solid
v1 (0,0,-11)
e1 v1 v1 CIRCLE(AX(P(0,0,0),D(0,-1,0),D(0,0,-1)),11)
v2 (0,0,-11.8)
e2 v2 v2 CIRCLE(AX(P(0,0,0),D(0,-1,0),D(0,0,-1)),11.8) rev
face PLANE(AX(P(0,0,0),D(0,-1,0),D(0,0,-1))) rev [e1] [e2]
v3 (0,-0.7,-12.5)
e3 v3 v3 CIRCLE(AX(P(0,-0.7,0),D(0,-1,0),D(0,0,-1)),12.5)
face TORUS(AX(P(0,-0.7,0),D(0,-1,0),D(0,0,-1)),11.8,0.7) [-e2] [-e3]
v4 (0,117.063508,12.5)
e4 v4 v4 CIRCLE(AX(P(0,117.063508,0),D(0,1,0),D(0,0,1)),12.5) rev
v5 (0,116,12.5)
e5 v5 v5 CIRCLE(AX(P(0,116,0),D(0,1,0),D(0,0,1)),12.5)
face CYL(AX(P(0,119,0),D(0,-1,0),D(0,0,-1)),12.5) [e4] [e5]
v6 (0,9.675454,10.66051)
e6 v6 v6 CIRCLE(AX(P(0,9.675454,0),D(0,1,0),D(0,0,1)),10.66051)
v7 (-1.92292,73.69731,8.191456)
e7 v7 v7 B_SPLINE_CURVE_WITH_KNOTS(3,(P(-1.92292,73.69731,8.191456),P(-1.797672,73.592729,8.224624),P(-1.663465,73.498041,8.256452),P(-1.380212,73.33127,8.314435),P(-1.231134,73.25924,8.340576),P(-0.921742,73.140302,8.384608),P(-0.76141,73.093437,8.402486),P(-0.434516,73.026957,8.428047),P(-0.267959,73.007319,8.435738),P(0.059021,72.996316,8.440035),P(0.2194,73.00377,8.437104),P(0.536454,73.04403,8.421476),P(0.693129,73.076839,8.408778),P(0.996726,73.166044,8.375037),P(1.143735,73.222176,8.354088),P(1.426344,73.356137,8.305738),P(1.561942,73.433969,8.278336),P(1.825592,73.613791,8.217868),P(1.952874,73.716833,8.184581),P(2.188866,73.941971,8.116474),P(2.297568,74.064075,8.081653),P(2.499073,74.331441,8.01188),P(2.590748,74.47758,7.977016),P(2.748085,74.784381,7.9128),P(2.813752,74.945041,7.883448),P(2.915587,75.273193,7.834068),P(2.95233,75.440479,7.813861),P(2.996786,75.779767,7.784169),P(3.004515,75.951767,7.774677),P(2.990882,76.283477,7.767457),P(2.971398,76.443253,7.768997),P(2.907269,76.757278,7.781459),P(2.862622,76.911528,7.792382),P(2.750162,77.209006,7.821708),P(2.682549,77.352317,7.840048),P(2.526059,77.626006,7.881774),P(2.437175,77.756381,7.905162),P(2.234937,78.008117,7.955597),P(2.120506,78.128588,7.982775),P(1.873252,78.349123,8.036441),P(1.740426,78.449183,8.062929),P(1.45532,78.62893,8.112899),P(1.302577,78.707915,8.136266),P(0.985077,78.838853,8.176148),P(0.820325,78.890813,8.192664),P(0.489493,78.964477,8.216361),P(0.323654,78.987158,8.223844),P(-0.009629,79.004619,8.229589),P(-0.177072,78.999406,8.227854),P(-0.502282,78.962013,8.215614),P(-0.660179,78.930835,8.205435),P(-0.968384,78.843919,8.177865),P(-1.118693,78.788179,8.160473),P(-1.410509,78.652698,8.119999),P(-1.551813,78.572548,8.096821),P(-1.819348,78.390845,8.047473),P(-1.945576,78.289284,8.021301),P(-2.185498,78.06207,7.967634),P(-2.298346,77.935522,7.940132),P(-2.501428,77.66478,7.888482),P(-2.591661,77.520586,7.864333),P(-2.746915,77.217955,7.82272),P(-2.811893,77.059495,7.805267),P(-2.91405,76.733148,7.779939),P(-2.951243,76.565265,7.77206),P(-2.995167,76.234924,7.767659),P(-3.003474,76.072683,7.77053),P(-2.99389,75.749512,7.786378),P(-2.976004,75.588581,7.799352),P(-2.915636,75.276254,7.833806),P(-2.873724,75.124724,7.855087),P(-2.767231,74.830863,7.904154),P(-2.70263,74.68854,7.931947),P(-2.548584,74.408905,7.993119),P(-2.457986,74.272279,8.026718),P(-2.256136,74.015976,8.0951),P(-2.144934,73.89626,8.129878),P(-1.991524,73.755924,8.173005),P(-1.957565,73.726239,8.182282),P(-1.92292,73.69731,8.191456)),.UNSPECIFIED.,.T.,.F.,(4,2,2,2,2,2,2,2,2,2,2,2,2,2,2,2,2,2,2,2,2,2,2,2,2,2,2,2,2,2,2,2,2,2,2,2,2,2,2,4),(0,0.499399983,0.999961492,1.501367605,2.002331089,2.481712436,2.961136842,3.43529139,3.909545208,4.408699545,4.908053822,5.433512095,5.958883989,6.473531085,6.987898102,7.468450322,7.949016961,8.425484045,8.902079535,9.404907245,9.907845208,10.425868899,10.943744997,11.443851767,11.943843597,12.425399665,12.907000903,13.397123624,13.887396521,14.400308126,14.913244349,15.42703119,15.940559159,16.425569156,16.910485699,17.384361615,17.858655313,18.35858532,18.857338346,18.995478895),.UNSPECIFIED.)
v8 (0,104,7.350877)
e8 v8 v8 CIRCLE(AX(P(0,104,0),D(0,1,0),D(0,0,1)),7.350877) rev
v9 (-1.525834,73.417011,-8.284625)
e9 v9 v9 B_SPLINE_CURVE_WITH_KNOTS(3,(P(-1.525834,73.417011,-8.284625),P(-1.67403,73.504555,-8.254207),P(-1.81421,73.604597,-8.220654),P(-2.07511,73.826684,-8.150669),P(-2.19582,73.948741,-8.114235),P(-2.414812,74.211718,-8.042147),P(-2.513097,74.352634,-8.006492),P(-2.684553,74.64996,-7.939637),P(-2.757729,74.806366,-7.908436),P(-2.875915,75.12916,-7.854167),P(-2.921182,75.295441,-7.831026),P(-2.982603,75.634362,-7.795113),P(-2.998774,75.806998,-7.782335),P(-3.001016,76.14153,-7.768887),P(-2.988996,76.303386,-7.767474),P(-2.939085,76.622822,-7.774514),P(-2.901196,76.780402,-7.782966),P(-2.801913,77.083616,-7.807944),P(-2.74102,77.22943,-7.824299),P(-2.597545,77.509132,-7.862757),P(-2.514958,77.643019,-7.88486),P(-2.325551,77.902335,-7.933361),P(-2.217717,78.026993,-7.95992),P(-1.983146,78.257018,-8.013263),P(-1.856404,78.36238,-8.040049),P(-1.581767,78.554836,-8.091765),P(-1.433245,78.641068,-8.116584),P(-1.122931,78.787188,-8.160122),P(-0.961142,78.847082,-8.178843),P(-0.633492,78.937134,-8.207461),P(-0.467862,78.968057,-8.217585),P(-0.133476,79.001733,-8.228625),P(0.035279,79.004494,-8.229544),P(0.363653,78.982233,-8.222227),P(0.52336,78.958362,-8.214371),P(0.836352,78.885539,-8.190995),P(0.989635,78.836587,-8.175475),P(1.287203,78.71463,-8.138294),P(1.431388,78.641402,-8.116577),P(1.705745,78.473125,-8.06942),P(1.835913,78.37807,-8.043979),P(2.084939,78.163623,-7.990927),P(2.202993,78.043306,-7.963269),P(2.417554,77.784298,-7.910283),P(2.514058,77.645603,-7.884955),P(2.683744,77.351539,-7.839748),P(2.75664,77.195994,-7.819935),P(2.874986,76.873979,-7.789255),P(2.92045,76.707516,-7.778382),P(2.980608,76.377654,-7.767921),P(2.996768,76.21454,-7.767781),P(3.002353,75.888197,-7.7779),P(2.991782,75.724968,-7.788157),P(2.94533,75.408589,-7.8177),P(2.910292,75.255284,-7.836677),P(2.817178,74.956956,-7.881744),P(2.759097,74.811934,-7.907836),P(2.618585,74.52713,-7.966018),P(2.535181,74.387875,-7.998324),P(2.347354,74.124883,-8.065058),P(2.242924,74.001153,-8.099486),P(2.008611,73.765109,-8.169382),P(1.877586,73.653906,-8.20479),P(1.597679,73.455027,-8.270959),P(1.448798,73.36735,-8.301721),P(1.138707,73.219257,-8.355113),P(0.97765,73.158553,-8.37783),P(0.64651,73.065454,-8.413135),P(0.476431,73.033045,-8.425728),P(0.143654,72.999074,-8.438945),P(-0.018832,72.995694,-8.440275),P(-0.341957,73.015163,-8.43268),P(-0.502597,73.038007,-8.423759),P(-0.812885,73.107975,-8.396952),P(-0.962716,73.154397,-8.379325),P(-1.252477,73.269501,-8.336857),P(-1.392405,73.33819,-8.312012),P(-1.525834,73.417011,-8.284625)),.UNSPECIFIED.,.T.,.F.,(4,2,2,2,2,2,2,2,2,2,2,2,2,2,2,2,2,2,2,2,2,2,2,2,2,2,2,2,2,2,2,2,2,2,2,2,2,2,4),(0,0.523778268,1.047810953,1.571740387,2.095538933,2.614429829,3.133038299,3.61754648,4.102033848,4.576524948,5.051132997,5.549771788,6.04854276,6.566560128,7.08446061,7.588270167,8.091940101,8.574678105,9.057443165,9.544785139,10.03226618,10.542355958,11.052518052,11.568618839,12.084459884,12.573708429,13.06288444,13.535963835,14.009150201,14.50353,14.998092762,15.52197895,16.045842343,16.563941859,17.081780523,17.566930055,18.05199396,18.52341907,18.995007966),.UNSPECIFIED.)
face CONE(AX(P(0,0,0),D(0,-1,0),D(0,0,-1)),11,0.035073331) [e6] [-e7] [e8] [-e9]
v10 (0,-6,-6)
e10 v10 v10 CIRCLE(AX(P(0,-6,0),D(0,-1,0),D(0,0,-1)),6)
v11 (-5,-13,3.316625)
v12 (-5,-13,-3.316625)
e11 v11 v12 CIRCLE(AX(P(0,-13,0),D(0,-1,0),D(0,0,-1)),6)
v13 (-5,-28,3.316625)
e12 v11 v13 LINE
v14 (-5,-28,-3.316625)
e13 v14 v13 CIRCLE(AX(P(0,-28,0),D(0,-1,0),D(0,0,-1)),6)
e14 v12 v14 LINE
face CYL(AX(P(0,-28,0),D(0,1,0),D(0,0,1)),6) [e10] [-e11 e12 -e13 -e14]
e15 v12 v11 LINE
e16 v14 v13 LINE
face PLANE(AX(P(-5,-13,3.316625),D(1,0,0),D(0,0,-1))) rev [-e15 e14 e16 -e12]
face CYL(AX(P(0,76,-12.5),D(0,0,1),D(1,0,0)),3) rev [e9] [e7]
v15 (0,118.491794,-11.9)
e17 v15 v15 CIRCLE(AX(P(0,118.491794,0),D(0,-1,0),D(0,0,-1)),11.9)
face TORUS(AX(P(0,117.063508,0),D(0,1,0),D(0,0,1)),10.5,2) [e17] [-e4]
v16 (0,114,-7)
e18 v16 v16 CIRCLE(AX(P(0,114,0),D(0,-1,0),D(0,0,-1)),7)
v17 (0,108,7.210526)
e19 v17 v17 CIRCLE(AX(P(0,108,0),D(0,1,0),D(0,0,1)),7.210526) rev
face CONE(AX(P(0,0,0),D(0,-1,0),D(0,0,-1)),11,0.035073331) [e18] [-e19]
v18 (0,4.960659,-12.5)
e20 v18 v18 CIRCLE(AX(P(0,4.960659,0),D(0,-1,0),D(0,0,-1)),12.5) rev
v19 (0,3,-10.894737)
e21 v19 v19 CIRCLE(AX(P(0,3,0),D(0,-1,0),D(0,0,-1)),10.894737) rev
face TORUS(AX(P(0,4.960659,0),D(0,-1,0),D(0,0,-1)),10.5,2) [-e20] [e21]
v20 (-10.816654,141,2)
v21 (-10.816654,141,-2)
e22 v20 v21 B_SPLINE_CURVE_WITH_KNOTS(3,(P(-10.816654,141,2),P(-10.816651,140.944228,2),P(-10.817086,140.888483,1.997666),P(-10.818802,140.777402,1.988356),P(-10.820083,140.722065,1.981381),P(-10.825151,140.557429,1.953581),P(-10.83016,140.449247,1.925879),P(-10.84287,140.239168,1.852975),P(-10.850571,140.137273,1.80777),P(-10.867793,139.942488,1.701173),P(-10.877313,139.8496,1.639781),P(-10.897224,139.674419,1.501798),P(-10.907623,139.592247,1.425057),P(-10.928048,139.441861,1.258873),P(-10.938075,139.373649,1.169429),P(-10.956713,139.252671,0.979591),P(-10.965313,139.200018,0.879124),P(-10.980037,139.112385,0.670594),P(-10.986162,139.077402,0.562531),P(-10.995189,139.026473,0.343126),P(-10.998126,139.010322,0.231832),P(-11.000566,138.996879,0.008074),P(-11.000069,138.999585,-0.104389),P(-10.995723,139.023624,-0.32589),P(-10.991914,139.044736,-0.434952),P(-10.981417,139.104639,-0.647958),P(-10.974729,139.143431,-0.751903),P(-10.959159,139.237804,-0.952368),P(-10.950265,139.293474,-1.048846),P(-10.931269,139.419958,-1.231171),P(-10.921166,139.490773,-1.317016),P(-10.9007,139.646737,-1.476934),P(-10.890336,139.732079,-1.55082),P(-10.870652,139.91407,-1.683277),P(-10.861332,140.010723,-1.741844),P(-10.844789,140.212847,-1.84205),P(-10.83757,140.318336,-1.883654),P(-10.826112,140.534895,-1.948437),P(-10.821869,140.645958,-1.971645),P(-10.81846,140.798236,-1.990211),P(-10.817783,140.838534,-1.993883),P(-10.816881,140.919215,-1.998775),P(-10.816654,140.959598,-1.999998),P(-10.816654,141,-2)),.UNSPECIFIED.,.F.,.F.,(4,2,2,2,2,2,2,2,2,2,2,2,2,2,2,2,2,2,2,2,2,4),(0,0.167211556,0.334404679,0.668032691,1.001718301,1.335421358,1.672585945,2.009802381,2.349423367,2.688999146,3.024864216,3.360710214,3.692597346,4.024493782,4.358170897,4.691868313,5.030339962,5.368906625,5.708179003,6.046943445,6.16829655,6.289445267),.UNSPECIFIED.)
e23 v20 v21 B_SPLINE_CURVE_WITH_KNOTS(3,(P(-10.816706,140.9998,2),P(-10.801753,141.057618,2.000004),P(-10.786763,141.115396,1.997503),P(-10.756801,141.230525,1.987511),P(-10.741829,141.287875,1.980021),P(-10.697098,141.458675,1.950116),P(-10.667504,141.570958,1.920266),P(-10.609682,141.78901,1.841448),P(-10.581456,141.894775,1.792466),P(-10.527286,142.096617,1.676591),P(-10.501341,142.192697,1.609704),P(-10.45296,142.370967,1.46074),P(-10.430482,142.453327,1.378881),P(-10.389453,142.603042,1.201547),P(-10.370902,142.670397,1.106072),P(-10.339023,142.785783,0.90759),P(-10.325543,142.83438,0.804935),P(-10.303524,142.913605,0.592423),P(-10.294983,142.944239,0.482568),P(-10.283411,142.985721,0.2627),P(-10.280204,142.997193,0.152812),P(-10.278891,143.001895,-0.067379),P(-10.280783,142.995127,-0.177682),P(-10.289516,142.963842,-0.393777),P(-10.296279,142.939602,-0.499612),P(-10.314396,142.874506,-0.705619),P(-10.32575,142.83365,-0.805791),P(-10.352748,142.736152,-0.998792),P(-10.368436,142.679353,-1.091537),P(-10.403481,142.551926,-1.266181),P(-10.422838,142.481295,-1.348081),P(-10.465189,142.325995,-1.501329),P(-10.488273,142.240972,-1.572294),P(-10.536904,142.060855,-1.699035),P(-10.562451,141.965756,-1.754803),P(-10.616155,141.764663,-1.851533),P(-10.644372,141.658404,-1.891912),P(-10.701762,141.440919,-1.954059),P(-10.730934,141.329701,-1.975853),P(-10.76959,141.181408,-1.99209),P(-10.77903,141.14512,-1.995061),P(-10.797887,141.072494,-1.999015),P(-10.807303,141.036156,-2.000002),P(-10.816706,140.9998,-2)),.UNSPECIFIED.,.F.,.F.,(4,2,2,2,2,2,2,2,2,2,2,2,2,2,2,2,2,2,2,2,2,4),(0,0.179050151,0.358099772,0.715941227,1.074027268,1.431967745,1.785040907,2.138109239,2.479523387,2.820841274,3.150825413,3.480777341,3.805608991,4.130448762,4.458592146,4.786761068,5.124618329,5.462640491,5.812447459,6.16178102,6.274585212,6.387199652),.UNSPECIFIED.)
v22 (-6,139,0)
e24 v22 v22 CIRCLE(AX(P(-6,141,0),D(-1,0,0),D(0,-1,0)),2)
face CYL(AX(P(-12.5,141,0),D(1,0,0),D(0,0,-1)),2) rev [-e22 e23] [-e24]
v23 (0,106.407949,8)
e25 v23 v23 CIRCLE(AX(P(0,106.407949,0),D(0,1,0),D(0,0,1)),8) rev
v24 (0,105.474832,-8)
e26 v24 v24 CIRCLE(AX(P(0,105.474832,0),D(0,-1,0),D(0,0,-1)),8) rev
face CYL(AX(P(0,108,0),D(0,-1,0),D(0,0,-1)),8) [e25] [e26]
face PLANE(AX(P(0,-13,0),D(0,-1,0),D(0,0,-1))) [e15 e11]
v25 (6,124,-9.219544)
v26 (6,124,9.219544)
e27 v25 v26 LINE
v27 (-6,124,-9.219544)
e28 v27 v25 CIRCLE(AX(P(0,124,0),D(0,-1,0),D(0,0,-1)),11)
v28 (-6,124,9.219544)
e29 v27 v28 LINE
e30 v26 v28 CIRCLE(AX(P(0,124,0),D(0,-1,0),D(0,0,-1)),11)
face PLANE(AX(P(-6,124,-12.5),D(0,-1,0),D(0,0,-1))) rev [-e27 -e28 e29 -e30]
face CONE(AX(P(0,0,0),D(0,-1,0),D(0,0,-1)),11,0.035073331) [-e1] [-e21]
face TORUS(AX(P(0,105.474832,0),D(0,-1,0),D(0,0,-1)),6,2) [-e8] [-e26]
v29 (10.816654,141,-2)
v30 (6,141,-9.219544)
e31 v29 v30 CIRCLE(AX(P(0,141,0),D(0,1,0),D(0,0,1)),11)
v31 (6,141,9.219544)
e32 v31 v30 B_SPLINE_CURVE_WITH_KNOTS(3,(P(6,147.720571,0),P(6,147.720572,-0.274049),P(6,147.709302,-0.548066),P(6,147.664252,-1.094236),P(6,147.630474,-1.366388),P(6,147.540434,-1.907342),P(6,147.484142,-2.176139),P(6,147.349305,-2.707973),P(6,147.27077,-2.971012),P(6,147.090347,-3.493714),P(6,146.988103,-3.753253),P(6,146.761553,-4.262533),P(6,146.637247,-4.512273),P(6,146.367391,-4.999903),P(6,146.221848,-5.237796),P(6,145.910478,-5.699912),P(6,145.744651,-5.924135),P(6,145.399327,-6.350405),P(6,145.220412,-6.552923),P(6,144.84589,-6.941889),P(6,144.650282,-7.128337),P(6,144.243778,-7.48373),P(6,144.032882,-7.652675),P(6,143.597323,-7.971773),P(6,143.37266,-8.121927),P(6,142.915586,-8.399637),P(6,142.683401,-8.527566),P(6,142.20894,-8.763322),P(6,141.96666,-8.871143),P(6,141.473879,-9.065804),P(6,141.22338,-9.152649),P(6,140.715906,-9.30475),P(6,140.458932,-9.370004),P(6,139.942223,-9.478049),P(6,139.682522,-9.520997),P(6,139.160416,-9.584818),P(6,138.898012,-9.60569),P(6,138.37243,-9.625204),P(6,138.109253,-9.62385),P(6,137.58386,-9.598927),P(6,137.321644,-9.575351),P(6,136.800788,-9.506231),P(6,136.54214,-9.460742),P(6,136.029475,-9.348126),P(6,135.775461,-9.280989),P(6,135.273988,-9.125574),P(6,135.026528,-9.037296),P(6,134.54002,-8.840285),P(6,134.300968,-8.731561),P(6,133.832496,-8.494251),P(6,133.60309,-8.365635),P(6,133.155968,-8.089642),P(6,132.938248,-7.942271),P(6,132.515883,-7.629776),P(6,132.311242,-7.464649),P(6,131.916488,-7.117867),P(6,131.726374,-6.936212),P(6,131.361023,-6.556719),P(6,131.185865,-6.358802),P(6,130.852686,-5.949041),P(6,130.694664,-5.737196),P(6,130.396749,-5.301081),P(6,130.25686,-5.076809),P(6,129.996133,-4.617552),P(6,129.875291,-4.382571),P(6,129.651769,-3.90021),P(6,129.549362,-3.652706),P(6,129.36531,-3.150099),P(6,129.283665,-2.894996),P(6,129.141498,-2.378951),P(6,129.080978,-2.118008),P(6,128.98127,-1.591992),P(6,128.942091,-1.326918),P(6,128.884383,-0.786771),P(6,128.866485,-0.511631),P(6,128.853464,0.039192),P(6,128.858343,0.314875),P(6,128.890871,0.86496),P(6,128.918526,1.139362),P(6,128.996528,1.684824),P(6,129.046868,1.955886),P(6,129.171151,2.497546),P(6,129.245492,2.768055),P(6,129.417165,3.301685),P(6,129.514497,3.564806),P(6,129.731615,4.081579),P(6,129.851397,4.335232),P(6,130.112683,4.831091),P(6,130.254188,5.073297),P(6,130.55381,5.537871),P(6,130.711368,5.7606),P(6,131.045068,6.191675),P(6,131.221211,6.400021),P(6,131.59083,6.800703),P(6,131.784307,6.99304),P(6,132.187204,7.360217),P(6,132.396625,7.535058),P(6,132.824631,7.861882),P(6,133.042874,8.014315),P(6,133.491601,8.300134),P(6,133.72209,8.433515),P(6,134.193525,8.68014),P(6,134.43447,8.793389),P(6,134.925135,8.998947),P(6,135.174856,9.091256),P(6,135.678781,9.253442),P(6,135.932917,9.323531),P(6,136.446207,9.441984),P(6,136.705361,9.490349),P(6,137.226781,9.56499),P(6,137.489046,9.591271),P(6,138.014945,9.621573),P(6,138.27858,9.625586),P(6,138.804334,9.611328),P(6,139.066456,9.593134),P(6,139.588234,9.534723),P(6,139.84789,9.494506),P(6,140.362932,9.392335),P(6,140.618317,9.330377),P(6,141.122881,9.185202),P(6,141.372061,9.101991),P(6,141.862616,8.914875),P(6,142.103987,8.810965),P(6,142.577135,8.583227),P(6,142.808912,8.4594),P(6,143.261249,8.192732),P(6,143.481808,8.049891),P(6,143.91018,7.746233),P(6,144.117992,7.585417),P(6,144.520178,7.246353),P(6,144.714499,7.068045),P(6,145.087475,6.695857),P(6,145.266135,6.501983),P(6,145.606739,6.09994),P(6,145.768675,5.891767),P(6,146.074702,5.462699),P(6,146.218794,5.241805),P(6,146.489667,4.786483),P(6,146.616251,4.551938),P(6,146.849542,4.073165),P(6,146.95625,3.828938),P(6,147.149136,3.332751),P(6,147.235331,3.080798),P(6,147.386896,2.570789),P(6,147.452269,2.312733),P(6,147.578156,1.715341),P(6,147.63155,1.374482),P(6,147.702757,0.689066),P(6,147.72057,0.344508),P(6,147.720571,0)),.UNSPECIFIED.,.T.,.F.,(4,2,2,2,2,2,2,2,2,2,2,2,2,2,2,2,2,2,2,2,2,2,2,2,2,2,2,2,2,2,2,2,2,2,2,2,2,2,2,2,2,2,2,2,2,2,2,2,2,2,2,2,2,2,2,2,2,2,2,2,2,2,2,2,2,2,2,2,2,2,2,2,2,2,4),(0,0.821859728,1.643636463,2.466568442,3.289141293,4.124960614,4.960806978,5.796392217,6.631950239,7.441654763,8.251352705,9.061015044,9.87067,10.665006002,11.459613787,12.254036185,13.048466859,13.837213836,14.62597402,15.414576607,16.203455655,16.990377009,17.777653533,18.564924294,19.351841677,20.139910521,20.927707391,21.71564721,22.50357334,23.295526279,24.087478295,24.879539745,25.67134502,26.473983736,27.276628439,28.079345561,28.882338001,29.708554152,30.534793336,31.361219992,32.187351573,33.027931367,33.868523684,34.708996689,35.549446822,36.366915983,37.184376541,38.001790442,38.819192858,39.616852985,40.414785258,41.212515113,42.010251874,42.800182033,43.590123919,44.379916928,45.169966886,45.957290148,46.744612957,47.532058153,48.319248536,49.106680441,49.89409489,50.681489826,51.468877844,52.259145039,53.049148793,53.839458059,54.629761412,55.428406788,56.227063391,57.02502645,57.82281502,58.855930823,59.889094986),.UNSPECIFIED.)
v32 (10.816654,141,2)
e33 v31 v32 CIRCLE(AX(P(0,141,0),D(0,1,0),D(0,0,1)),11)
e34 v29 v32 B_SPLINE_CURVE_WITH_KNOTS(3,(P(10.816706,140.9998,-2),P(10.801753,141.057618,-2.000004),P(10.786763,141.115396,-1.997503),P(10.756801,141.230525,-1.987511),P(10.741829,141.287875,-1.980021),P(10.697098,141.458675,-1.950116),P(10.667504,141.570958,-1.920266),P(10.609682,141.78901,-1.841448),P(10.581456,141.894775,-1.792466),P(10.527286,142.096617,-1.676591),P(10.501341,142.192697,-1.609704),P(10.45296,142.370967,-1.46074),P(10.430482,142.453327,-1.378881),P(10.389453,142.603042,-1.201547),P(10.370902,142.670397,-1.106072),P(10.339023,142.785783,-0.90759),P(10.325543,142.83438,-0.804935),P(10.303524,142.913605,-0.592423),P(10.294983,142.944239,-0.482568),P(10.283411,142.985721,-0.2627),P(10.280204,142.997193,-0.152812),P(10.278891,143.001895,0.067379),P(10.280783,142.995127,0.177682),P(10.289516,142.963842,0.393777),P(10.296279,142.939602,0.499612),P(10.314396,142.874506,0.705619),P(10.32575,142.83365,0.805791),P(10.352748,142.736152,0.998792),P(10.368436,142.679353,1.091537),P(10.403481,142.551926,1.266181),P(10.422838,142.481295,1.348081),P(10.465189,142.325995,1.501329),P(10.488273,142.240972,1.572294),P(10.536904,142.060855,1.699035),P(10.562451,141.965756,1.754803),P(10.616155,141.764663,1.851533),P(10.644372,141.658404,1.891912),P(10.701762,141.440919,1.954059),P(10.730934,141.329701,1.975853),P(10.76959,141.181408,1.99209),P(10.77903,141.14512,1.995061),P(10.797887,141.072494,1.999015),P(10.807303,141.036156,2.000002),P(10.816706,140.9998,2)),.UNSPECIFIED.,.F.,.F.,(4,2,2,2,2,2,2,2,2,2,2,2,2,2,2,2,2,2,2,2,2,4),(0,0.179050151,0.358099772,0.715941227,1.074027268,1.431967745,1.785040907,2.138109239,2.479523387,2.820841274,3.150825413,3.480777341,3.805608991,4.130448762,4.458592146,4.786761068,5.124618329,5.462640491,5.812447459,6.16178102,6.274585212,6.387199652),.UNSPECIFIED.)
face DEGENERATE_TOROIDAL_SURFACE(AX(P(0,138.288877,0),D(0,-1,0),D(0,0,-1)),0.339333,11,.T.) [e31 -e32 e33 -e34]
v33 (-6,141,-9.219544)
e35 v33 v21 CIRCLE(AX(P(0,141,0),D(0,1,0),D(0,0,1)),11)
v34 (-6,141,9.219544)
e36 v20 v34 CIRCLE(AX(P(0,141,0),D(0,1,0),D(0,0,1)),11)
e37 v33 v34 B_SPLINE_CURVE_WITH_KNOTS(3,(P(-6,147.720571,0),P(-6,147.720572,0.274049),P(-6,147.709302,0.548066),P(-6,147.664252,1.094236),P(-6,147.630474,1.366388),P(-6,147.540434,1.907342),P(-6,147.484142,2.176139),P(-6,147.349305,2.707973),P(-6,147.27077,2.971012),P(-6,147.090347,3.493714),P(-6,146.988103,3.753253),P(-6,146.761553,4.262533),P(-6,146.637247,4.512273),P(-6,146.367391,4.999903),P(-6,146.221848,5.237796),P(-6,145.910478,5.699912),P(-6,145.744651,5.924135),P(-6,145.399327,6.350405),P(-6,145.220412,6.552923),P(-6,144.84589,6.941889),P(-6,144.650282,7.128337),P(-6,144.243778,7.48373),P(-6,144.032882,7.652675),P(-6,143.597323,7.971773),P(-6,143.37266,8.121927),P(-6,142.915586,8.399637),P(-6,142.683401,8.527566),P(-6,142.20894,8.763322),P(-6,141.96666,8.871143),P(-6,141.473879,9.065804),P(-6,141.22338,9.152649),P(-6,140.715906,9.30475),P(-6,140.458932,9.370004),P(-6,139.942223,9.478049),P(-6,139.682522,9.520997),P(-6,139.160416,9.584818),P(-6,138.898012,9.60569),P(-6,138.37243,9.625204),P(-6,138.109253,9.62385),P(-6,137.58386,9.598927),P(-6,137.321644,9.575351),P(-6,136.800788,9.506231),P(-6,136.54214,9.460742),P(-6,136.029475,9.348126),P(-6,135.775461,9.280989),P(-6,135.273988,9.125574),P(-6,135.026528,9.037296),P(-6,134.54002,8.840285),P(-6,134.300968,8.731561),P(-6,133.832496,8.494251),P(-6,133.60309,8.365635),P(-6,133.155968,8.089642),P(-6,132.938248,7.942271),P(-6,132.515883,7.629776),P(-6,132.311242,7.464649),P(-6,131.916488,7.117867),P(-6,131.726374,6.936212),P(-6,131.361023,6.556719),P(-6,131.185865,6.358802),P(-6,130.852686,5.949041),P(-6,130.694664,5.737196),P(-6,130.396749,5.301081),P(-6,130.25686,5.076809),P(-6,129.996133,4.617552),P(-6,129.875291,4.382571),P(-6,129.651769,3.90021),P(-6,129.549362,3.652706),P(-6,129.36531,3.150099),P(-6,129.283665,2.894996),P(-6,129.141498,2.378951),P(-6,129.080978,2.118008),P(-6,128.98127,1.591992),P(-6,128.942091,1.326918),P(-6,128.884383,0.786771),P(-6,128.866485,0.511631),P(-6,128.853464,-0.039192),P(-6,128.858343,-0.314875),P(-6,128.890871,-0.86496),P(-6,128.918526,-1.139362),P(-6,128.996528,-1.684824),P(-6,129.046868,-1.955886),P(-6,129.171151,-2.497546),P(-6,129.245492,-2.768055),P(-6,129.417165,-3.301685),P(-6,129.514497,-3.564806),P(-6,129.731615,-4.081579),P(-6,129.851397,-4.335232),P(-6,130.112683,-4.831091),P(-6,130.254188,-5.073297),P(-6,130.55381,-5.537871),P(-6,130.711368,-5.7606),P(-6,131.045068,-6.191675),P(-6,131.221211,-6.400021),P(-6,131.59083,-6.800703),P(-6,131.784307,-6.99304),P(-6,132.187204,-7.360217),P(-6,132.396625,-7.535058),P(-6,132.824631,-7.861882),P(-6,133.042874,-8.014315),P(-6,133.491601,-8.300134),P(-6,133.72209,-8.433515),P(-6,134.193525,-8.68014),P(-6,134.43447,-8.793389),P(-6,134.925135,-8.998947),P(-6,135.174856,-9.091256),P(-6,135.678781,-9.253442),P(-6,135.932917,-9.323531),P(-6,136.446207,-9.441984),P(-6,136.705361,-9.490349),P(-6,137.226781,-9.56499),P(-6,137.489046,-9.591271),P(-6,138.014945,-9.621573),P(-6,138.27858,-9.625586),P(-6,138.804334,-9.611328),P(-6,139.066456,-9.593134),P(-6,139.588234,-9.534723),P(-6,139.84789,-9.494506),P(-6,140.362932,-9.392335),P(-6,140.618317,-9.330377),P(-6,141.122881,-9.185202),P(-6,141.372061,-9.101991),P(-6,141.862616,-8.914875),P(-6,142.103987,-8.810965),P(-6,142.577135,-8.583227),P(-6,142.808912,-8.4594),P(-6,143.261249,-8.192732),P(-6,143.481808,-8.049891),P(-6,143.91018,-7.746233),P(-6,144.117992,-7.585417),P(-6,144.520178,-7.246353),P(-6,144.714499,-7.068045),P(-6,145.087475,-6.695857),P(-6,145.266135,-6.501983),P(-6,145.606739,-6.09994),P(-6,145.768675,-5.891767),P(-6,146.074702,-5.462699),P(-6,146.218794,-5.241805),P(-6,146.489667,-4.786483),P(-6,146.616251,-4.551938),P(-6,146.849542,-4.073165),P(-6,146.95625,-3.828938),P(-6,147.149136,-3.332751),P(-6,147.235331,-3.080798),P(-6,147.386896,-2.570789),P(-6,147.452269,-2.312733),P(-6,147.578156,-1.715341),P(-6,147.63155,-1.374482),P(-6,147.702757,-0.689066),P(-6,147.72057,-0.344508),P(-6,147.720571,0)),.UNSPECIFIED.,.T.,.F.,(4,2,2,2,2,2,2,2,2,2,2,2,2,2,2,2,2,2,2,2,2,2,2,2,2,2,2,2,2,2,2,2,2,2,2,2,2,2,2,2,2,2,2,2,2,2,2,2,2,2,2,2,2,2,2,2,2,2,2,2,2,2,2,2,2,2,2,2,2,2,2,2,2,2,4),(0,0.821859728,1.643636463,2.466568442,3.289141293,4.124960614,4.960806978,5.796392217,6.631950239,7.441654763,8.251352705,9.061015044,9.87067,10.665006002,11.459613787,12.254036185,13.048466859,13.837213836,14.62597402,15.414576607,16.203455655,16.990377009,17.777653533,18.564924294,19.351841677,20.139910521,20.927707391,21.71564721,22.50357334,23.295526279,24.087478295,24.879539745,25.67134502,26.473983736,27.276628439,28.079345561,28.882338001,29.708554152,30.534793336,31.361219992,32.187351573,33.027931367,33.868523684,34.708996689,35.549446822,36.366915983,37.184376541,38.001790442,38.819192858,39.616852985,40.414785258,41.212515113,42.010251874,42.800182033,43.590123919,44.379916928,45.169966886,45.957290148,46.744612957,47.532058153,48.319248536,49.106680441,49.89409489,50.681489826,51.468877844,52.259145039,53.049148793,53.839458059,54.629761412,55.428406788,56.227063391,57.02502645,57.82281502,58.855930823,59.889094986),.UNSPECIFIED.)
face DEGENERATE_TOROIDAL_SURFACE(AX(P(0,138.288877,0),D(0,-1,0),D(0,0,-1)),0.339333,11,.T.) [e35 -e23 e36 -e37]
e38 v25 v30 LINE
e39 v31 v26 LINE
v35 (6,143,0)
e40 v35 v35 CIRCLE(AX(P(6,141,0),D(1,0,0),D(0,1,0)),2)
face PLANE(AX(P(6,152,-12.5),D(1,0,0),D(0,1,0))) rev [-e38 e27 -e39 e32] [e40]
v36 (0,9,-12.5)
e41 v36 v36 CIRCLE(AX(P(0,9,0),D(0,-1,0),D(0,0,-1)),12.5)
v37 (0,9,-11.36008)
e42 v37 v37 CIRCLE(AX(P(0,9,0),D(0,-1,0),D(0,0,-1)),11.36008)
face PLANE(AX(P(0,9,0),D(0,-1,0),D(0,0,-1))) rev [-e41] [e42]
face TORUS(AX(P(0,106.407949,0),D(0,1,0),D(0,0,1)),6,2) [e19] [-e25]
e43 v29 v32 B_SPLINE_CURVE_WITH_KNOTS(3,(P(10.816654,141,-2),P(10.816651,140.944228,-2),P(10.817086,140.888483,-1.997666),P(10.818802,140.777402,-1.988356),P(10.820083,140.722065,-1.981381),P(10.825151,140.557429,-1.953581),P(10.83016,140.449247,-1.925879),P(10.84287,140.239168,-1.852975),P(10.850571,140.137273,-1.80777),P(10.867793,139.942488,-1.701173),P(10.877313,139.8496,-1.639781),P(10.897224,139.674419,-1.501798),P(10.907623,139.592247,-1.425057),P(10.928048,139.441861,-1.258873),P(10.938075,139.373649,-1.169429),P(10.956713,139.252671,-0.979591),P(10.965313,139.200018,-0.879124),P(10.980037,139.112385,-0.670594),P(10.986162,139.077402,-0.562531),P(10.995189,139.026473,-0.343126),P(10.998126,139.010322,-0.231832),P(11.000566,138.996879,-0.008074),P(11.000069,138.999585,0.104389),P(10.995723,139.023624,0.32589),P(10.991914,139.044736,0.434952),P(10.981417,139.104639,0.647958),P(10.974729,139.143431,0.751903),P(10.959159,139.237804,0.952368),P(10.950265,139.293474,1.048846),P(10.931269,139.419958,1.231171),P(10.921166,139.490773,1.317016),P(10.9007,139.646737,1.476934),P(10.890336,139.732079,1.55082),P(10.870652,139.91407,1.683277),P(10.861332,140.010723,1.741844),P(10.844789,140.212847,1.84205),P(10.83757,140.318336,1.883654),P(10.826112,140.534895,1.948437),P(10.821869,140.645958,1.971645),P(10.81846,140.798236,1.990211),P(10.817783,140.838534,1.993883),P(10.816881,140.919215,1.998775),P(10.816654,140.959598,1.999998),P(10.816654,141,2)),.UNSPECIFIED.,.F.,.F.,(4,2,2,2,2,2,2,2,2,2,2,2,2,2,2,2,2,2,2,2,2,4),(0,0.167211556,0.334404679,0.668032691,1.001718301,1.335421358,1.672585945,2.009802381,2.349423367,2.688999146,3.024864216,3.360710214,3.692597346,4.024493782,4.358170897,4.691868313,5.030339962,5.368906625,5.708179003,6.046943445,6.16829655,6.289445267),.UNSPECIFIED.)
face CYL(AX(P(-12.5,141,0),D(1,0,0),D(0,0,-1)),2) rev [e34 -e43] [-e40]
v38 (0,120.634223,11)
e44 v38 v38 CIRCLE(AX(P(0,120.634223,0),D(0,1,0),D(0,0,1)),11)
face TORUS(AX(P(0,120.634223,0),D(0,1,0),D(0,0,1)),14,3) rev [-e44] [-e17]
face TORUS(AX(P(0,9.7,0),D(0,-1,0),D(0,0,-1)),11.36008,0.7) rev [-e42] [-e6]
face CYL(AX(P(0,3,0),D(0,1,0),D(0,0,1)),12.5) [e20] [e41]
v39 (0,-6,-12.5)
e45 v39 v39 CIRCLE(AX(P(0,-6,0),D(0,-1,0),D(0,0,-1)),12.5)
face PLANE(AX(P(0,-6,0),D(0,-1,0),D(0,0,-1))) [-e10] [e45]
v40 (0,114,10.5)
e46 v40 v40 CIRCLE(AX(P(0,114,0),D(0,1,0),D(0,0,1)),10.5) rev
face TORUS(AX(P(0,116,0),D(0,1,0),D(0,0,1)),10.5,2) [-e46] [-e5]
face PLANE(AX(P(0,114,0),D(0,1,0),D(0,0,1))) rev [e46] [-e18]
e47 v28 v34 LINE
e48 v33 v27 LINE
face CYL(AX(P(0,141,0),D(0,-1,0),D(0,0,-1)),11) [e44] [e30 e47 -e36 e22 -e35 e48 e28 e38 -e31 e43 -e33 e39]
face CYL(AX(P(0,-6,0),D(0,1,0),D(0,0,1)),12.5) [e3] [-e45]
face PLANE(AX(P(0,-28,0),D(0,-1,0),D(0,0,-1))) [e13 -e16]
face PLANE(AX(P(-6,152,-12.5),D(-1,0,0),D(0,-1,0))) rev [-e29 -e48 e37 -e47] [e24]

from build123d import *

# Parameters (mm, degrees)
SKETCH2_R               = 12.5
BOSS_EXTRUDE1_DEPTH     = 6
BOSS_EXTRUDE2_START     = -12
SKETCH3_R               = 12.5
BOSS_EXTRUDE2_DEPTH     = 3
FILLET1_R               = 2
FILLET2_R               = 0.7
SKETCH4_R               = 6
BOSS_EXTRUDE3_DEPTH     = 22
CUT_EXTRUDE1_START      = -15
CUT_EXTRUDE1_DEPTH      = 15
BOSS_EXTRUDE4_START     = -8
SKETCH6_R               = 8
BOSS_EXTRUDE4_DEPTH     = 2
FILLET3_R               = 2
SKETCH7_R               = 12.5
BOSS_EXTRUDE5_DEPTH     = 5
SKETCH8_R               = 11
BOSS_EXTRUDE6_DEPTH     = 22
FILLET4_R               = 2
FILLET5_R               = 3
FILLET6_R               = 0.7
CUT_EXTRUDE2_DEPTH      = 151.331862616
CUT_EXTRUDE2_DEPTH_BACK = 151.331862616
SKETCH10_W              = 12
SKETCH10_H              = 28
CUT_EXTRUDE3_DEPTH      = 149.77455171
CUT_EXTRUDE3_DEPTH_BACK = 149.77455171
SKETCH11_R              = 3
CUT_EXTRUDE4_DEPTH      = 149.77455171
CUT_EXTRUDE4_DEPTH_BACK = 149.77455171
SKETCH12_R              = 2


with BuildPart() as part:
    # Sketch1 → Revolve1 (revolve)
    with BuildSketch(Plane.XY, mode=Mode.PRIVATE) as revolve1_sk:
        Polygon((0, 0), (0, 114), (7, 114), (11, 0), align=None)
    revolve(revolve1_sk.sketch.rotate(Axis((0, 0, 0), (0, 1, 0)), 90), axis=Axis((0, 0, 0), (0, 1, 0)))

    # Sketch2 → Boss-Extrude1 (add)
    with BuildSketch(Plane.XZ):
        with Locations(Location((0, 0, 0), (0, 0, 270))):
            Circle(SKETCH2_R)
    extrude(amount=BOSS_EXTRUDE1_DEPTH)

    # Sketch3 → Boss-Extrude2 (add, symmetric)
    with BuildSketch(Plane.XZ.offset(6).offset(BOSS_EXTRUDE2_START)):
        with Locations(Location((0, 0, 0), (0, 0, 270))):
            Circle(SKETCH3_R)
    extrude(amount=BOSS_EXTRUDE2_DEPTH, both=True)

    # Fillet1
    # the kernel refuses this fillet: 2 mm, written as the material it takes off along each edge
    with BuildSketch(Plane(origin=(0, 3, 0), x_dir=(0, 0, -1), z_dir=(-1, 0, 0))) as fillet1_piece_1:
        with BuildLine():
            CenterArc((10.5, -1.960658773), FILLET1_R, 0, 78.616886518)
            Line((12.5, -1.960658773), (12.54, -1.960658773))
            Line((12.54, -1.960658773), (12.54, 0))
            Line((12.54, 0), (12.5, 0.04))
            ThreePointArc((12.5, 0.04), (11.697368421, 0.04), (10.902631579, 0.039213175))
            Line((10.902631579, 0.039213175), (10.894736842, 0))
        make_face()
    revolve(axis=Axis((0, 3, 0), (0, -1, 0)), mode=Mode.SUBTRACT)

    # Fillet2
    fillet2_edges = [part.edges().sort_by_distance(p)[0] for p in [
        (0, 0, 12.5),
    ]]
    fillet(fillet2_edges, radius=FILLET2_R)

    # Sketch4 → Boss-Extrude3 (add)
    with BuildSketch(Plane.XZ.offset(6)):
        with Locations(Location((0, 0, 0), (0, 0, 270))):
            Circle(SKETCH4_R)
    extrude(amount=BOSS_EXTRUDE3_DEPTH)

    # Sketch5 → Cut-Extrude1 (cut)
    with BuildSketch(Plane(origin=(0, -28, 0), x_dir=(-1, 0, 0), z_dir=(0, -1, 0)).offset(CUT_EXTRUDE1_START)):
        with BuildLine():
            Line((5, -3.31662479), (5, 3.31662479))
            ThreePointArc((5, 3.31662479), (6, 0), (5, -3.31662479))
        make_face()
    extrude(amount=CUT_EXTRUDE1_DEPTH, mode=Mode.SUBTRACT)

    # Sketch6 → Boss-Extrude4 (add, symmetric)
    with BuildSketch(Plane(origin=(0, 114, 0), x_dir=(1, 0, 0), z_dir=(0, 1, 0)).offset(BOSS_EXTRUDE4_START)):
        with Locations(Location((0, 0, 0), (0, 0, 270))):
            Circle(SKETCH6_R)
    extrude(amount=BOSS_EXTRUDE4_DEPTH, both=True)

    # Fillet3
    # the kernel refuses this fillet: 2 mm, written as the material it takes off along each edge
    with BuildSketch(Plane(origin=(0, 104, 0), x_dir=(0, 0, 1), z_dir=(-1, 0, 0))) as fillet3_piece_1:
        with BuildLine():
            CenterArc((6, 1.474832468), FILLET3_R, 312.488219007, 47.511780993)
            Line((8, 1.474832468), (8.04, 1.474832468))
            Line((8.04, 1.474832468), (8.04, 0))
            Line((8.04, 0), (8, -0.04))
            ThreePointArc((8, -0.04), (7.675438596, -0.04), (7.377894737, -0.029496649))
            Line((7.377894737, -0.029496649), (7.350877193, 0))
        make_face()
    revolve(axis=Axis((0, 104, 0), (0, 1, 0)), mode=Mode.SUBTRACT)
    with BuildSketch(Plane(origin=(0, 108, 0), x_dir=(0, 0, 1), z_dir=(-1, 0, 0))) as fillet3_piece_2:
        with BuildLine():
            CenterArc((6, -1.592050891), FILLET3_R, 0, 52.752219104)
            Line((7.210526316, 0), (7.234736842, 0.031841018))
            ThreePointArc((7.234736842, 0.031841018), (7.605263158, 0.04), (8, 0.04))
            Line((8, 0.04), (8.04, 0))
            Line((8.04, 0), (8.04, -1.592050891))
            Line((8.04, -1.592050891), (8, -1.592050891))
        make_face()
    revolve(axis=Axis((0, 108, 0), (0, 1, 0)), mode=Mode.SUBTRACT)

    # Sketch7 → Boss-Extrude5 (add)
    with BuildSketch(Plane(origin=(0, 114, 0), x_dir=(1, 0, 0), z_dir=(0, 1, 0))):
        with Locations(Location((0, 0, 0), (0, 0, 90))):
            Circle(SKETCH7_R)
    extrude(amount=BOSS_EXTRUDE5_DEPTH)

    # Sketch8 → Boss-Extrude6 (add)
    with BuildSketch(Plane(origin=(0, 119, 0), x_dir=(1, 0, 0), z_dir=(0, 1, 0))):
        with Locations(Location((0, 0, 0), (0, 0, 270))):
            Circle(SKETCH8_R)
    extrude(amount=BOSS_EXTRUDE6_DEPTH)

    # Fillet4
    # the kernel refuses this fillet: 2 mm, written as the material it takes off along each edge
    with BuildSketch(Plane(origin=(0, 114, 0), x_dir=(0, 0, -1), z_dir=(1, 0, 0))) as fillet4_piece_1:
        with BuildLine():
            CenterArc((12.5 - FILLET4_R, FILLET4_R), FILLET4_R, 270, 90)
            Line((12.5 - FILLET4_R, 0), (12.5 - FILLET4_R, -FILLET4_R * 0.02))
            Line((12.5 - FILLET4_R, -FILLET4_R * 0.02), (12.5 + FILLET4_R * 0.02, -FILLET4_R * 0.02))
            Line((12.5 + FILLET4_R * 0.02, -FILLET4_R * 0.02), (12.5 + FILLET4_R * 0.02, FILLET4_R))
            Line((12.5 + FILLET4_R * 0.02, FILLET4_R), (12.5, FILLET4_R))
        make_face()
    revolve(axis=Axis((0, 114, 0), (0, 1, 0)), mode=Mode.SUBTRACT)
    with BuildSketch(Plane(origin=(0, 119, 0), x_dir=(0, 0, -1), z_dir=(1, 0, 0))) as fillet4_piece_2:
        with BuildLine():
            CenterArc((10.5, -1.936491673), FILLET4_R, 0, 75.522487814)
            Line((11, 0), (11.01, 0.038729833))
            ThreePointArc((11.01, 0.038729833), (11.75, 0.04), (12.5, 0.04))
            Line((12.5, 0.04), (12.54, 0))
            Line((12.54, 0), (12.54, -1.936491673))
            Line((12.54, -1.936491673), (12.5, -1.936491673))
        make_face()
    revolve(axis=Axis((0, 119, 0), (0, 1, 0)), mode=Mode.SUBTRACT)

    # Fillet5
    fillet5_edges = [part.edges().sort_by_distance(p)[0] for p in [
        (-11, 119, 0),
    ]]
    fillet(fillet5_edges, radius=FILLET5_R)

    # Fillet6
    fillet6_edges = [part.edges().sort_by_distance(p)[0] for p in [
        (0, 9, 10.684210526),
    ]]
    fillet(fillet6_edges, radius=FILLET6_R)

    # Sketch9 → Revolve2 (revolve)
    with BuildSketch(Plane.XY, mode=Mode.PRIVATE) as revolve2_sk:
        with BuildLine():
            Line((11, 141), (0, 141))
            Line((0, 141), (0, 149.283642085))
            ThreePointArc((0, 149.283642085), (6.956520199, 147.075960883), (11, 141))
        make_face()
    revolve(revolve2_sk.sketch.rotate(Axis((0, 141, 0), (0, 1, 0)), 270), axis=Axis((0, 141, 0), (0, 1, 0)))

    # Sketch10 → Cut-Extrude2 (cut, two sides: drawn at the far end of the back side and taken through both)
    with BuildSketch(Plane.XY.offset(-CUT_EXTRUDE2_DEPTH_BACK)):
        with Locations((0, 138)):
            Rectangle(SKETCH10_W, SKETCH10_H)
    extrude(amount=CUT_EXTRUDE2_DEPTH + CUT_EXTRUDE2_DEPTH_BACK, mode=Mode.SUBTRACT)

    # Sketch11 → Cut-Extrude3 (cut, two sides: drawn at the far end of the back side and taken through both)
    with BuildSketch(Plane.XY.offset(-CUT_EXTRUDE3_DEPTH_BACK)):
        with Locations(Location((0, 76, 0), (0, 0, 270.000000038))):
            Circle(SKETCH11_R)
    extrude(amount=CUT_EXTRUDE3_DEPTH + CUT_EXTRUDE3_DEPTH_BACK, mode=Mode.SUBTRACT)

    # Sketch12 → Cut-Extrude4 (cut, two sides: drawn at the far end of the back side and taken through both)
    with BuildSketch(Plane(origin=(0, 0, 0), x_dir=(0, 0, -1), z_dir=(1, 0, 0)).offset(-CUT_EXTRUDE4_DEPTH_BACK)):
        with Locations((0, 141)):
            Circle(SKETCH12_R)
    extrude(amount=CUT_EXTRUDE4_DEPTH + CUT_EXTRUDE4_DEPTH_BACK, mode=Mode.SUBTRACT)


solid = part.part
